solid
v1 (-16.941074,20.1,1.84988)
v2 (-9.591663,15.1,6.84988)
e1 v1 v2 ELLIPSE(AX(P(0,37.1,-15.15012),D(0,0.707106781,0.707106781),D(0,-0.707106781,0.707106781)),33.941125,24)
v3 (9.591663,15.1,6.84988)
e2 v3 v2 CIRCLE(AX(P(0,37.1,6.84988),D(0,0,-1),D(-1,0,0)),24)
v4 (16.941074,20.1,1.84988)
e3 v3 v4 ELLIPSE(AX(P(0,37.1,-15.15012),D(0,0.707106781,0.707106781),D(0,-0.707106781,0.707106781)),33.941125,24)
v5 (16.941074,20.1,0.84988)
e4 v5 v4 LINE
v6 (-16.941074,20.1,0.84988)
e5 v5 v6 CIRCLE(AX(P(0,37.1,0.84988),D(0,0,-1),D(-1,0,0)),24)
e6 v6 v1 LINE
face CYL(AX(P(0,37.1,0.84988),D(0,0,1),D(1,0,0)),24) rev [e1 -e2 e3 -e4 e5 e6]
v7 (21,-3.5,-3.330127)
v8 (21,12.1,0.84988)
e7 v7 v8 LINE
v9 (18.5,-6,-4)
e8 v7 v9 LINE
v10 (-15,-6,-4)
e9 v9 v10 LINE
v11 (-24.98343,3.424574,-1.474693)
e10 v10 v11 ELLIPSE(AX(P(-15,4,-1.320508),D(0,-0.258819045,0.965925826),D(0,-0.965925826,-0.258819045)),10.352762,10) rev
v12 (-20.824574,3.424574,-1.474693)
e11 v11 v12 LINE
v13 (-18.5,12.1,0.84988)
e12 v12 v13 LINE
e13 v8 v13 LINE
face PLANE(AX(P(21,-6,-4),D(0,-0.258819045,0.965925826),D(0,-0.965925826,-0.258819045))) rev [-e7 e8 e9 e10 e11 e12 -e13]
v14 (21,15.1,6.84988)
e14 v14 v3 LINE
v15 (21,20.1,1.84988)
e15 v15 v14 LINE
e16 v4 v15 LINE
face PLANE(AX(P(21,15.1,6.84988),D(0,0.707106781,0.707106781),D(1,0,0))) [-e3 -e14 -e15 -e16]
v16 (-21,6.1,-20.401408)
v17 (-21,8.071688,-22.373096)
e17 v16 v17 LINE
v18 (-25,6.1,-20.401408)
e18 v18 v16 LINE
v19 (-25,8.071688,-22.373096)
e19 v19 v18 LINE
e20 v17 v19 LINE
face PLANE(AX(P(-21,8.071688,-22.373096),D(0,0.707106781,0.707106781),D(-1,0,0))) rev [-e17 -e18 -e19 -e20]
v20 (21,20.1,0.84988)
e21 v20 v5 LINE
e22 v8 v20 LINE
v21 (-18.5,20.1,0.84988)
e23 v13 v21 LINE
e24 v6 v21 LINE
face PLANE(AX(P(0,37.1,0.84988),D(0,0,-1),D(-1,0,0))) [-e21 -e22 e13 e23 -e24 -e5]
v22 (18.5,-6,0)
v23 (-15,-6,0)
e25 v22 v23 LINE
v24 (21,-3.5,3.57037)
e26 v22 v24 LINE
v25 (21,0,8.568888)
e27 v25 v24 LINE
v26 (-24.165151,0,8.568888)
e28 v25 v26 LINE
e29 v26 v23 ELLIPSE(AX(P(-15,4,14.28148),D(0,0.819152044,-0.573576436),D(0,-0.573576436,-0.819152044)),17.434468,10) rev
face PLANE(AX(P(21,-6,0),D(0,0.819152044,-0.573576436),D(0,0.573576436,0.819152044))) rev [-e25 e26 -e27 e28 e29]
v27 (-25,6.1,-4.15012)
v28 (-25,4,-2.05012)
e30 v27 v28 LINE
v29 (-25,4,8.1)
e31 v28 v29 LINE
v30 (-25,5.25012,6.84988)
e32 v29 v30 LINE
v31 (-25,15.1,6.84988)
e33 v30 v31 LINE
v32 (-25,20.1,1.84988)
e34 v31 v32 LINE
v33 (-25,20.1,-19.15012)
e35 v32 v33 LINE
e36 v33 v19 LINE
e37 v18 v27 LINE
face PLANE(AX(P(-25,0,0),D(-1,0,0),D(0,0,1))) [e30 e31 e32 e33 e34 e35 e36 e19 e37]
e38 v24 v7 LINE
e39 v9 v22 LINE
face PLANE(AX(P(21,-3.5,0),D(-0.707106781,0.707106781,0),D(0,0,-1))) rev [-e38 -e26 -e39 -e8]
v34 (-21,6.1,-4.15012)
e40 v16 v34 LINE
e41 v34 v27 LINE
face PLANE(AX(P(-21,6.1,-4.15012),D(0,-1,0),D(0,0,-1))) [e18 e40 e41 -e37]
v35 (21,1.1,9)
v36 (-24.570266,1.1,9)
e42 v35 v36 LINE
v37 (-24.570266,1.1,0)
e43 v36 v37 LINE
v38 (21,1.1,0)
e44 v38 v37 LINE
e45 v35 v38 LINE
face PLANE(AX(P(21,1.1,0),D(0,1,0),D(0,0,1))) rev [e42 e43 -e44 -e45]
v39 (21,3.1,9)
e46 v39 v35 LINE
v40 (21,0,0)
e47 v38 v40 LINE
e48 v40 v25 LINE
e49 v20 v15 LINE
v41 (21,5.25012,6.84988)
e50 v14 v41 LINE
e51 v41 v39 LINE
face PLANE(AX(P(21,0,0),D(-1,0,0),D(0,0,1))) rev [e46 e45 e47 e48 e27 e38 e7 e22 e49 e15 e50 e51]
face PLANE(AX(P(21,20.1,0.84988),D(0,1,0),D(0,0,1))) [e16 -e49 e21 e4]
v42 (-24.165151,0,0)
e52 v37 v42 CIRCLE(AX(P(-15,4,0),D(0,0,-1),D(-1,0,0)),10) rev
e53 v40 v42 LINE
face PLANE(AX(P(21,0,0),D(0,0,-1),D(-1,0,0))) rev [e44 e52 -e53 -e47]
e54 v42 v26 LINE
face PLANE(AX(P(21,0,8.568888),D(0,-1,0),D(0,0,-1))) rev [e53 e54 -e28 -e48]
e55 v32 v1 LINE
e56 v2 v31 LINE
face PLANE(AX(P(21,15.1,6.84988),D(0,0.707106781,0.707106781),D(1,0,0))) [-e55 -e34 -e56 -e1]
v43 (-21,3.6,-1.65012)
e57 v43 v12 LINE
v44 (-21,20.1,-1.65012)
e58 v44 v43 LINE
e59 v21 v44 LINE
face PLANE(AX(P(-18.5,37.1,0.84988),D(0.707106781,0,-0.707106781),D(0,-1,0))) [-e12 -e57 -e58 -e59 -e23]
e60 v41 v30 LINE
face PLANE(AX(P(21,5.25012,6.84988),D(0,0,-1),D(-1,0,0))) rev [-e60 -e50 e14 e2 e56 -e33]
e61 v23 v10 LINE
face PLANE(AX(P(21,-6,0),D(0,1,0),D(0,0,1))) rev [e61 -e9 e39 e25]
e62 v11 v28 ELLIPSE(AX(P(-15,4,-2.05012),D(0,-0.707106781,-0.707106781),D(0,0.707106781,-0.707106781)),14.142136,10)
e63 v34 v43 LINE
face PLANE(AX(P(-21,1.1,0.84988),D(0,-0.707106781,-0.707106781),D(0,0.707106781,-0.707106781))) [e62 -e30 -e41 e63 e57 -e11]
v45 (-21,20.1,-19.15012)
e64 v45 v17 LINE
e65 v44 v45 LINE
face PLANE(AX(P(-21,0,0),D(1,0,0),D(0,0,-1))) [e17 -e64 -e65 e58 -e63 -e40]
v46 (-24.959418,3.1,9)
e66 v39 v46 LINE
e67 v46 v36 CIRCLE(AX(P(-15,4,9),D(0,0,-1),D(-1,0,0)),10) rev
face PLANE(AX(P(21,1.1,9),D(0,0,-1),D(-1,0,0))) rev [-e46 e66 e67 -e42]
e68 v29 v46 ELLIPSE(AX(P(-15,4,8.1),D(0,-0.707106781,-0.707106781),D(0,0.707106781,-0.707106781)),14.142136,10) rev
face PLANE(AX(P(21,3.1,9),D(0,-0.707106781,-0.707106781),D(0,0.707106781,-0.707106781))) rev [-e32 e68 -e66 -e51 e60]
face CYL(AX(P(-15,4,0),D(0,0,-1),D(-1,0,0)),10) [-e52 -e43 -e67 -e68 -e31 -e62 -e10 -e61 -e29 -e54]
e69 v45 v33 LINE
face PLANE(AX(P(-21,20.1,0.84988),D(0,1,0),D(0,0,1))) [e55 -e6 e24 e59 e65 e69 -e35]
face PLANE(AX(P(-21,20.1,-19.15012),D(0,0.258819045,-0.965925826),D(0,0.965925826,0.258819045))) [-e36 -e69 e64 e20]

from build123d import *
from OCP.BRepFilletAPI import BRepFilletAPI_MakeChamfer

# Parameters (mm, degrees)
BOSS_EXTRUDE1_DEPTH  = 21
BOSS_EXTRUDE4_DEPTH  = 6
CHAMFER4_SIZE        = 5
BOSS_EXTRUDE5_DEPTH  = 4
BOSS_EXTRUDE10_DEPTH = 4
FILLET1_R            = 10
CHAMFER5_SIZE        = 2.5
CHAMFER5_SIZE2       = 2.041241452


with BuildPart() as part:
    # Sketch1 → Boss-Extrude1 (new, symmetric)
    with BuildSketch(Plane(origin=(0, 0, 0), x_dir=(0, 0, -1), z_dir=(1, 0, 0))):
        Polygon((0, -6), (4, -6), (-0.849880383, 12.1), (-6.849880383, 12.1), (-6.849880383, 5.250119617), (-9, 3.1), (-9, 1.1), (0, 1.1), (0, 0), (-8.56888804, 0), align=None)
    extrude(amount=BOSS_EXTRUDE1_DEPTH, both=True)

    # Sketch7 → Boss-Extrude4 (add)
    with BuildSketch(Plane.XY.offset(6.849880383)):
        with BuildLine():
            Line((-21, 12.1), (-21, 20.1))
            Line((-21, 20.1), (-16.941074346, 20.1))
            ThreePointArc((-16.941074346, 20.1), (0, 13.1), (16.941074346, 20.1))
            Line((16.941074346, 20.1), (21, 20.1))
            Line((21, 20.1), (21, 12.1))
            Line((21, 12.1), (-21, 12.1))
        make_face()
    extrude(amount=-BOSS_EXTRUDE4_DEPTH)

    # Chamfer4
    chamfer4_edges = [part.edges().sort_by_distance(p)[0] for p in [
        (-18.970537173, 20.1, 6.849880383),
        (18.970537173, 20.1, 6.849880383),
    ]]
    chamfer(chamfer4_edges, length=CHAMFER4_SIZE)

    # Sketch15 → Boss-Extrude5 (add)
    with BuildSketch(Plane.ZY.offset(21)):
        Polygon((9, 1.1), (9, 3.1), (6.849880383, 5.250119617), (6.849880383, 15.1), (1.849880383, 20.1), (0.849880383, 20.1), (0.849880383, 12.1), (-4, -6), (0, -6), (8.56888804, 0), (0, 0), (0, 1.1), align=None)
    extrude(amount=BOSS_EXTRUDE5_DEPTH)

    # Sketch22 → Boss-Extrude10 (add)
    with BuildSketch(Plane.ZY.offset(25)):
        Polygon((0.849880383, 6.1), (0.849880383, 1.1), (-4.150119617, 6.1), (-19.150119617, 6.1), (-22.901408311, 6.1), (-19.150119617, 20.1), (0.849880383, 20.1), align=None)
    extrude(amount=-BOSS_EXTRUDE10_DEPTH)

    # Fillet1
    # the kernel refuses this fillet: 10 mm, written as the material it takes off along each edge
    with BuildSketch(Plane(origin=(-25, -6, -29), x_dir=(1, 0, 0), z_dir=(0, 0, 1))) as fillet1_piece_1:
        with BuildLine():
            CenterArc((FILLET1_R, FILLET1_R), FILLET1_R, 180, 90)
            Line((0, FILLET1_R), (0, 0))
            Line((0, 0), (FILLET1_R, 0))
        make_face()
    extrude(amount=54, mode=Mode.SUBTRACT)

    # Chamfer5: one chamfer whose edges measure the first distance from different faces: ONE call of the kernel's chamfer builder (chamfer() names one face for all edges)
    chamfer5_edges_1 = [part.edges().sort_by_distance(p)[0] for p in [
        (21, -6, -2),
        (-21, 16.1, 0.849880383),
    ]]
    chamfer5_edges_2 = [part.edges().sort_by_distance(p)[0] for p in [
        (-23, 6.1, -22.901408311),
    ]]
    chamfer5_side_2 = [part.faces().sort_by_distance(p)[0] for p in [
        (-23, 6.1, -13.525763964),
    ]]
    chamfer5 = BRepFilletAPI_MakeChamfer(part.part.solid().wrapped)
    for e in chamfer5_edges_1:
        chamfer5.Add(CHAMFER5_SIZE, e.wrapped)
    for e in chamfer5_edges_2:
        chamfer5.Add(CHAMFER5_SIZE, CHAMFER5_SIZE2, e.wrapped, chamfer5_side_2[0].wrapped)  # the first distance lies on this face
    add(Compound.cast(chamfer5.Shape()), mode=Mode.REPLACE)


solid = part.part
